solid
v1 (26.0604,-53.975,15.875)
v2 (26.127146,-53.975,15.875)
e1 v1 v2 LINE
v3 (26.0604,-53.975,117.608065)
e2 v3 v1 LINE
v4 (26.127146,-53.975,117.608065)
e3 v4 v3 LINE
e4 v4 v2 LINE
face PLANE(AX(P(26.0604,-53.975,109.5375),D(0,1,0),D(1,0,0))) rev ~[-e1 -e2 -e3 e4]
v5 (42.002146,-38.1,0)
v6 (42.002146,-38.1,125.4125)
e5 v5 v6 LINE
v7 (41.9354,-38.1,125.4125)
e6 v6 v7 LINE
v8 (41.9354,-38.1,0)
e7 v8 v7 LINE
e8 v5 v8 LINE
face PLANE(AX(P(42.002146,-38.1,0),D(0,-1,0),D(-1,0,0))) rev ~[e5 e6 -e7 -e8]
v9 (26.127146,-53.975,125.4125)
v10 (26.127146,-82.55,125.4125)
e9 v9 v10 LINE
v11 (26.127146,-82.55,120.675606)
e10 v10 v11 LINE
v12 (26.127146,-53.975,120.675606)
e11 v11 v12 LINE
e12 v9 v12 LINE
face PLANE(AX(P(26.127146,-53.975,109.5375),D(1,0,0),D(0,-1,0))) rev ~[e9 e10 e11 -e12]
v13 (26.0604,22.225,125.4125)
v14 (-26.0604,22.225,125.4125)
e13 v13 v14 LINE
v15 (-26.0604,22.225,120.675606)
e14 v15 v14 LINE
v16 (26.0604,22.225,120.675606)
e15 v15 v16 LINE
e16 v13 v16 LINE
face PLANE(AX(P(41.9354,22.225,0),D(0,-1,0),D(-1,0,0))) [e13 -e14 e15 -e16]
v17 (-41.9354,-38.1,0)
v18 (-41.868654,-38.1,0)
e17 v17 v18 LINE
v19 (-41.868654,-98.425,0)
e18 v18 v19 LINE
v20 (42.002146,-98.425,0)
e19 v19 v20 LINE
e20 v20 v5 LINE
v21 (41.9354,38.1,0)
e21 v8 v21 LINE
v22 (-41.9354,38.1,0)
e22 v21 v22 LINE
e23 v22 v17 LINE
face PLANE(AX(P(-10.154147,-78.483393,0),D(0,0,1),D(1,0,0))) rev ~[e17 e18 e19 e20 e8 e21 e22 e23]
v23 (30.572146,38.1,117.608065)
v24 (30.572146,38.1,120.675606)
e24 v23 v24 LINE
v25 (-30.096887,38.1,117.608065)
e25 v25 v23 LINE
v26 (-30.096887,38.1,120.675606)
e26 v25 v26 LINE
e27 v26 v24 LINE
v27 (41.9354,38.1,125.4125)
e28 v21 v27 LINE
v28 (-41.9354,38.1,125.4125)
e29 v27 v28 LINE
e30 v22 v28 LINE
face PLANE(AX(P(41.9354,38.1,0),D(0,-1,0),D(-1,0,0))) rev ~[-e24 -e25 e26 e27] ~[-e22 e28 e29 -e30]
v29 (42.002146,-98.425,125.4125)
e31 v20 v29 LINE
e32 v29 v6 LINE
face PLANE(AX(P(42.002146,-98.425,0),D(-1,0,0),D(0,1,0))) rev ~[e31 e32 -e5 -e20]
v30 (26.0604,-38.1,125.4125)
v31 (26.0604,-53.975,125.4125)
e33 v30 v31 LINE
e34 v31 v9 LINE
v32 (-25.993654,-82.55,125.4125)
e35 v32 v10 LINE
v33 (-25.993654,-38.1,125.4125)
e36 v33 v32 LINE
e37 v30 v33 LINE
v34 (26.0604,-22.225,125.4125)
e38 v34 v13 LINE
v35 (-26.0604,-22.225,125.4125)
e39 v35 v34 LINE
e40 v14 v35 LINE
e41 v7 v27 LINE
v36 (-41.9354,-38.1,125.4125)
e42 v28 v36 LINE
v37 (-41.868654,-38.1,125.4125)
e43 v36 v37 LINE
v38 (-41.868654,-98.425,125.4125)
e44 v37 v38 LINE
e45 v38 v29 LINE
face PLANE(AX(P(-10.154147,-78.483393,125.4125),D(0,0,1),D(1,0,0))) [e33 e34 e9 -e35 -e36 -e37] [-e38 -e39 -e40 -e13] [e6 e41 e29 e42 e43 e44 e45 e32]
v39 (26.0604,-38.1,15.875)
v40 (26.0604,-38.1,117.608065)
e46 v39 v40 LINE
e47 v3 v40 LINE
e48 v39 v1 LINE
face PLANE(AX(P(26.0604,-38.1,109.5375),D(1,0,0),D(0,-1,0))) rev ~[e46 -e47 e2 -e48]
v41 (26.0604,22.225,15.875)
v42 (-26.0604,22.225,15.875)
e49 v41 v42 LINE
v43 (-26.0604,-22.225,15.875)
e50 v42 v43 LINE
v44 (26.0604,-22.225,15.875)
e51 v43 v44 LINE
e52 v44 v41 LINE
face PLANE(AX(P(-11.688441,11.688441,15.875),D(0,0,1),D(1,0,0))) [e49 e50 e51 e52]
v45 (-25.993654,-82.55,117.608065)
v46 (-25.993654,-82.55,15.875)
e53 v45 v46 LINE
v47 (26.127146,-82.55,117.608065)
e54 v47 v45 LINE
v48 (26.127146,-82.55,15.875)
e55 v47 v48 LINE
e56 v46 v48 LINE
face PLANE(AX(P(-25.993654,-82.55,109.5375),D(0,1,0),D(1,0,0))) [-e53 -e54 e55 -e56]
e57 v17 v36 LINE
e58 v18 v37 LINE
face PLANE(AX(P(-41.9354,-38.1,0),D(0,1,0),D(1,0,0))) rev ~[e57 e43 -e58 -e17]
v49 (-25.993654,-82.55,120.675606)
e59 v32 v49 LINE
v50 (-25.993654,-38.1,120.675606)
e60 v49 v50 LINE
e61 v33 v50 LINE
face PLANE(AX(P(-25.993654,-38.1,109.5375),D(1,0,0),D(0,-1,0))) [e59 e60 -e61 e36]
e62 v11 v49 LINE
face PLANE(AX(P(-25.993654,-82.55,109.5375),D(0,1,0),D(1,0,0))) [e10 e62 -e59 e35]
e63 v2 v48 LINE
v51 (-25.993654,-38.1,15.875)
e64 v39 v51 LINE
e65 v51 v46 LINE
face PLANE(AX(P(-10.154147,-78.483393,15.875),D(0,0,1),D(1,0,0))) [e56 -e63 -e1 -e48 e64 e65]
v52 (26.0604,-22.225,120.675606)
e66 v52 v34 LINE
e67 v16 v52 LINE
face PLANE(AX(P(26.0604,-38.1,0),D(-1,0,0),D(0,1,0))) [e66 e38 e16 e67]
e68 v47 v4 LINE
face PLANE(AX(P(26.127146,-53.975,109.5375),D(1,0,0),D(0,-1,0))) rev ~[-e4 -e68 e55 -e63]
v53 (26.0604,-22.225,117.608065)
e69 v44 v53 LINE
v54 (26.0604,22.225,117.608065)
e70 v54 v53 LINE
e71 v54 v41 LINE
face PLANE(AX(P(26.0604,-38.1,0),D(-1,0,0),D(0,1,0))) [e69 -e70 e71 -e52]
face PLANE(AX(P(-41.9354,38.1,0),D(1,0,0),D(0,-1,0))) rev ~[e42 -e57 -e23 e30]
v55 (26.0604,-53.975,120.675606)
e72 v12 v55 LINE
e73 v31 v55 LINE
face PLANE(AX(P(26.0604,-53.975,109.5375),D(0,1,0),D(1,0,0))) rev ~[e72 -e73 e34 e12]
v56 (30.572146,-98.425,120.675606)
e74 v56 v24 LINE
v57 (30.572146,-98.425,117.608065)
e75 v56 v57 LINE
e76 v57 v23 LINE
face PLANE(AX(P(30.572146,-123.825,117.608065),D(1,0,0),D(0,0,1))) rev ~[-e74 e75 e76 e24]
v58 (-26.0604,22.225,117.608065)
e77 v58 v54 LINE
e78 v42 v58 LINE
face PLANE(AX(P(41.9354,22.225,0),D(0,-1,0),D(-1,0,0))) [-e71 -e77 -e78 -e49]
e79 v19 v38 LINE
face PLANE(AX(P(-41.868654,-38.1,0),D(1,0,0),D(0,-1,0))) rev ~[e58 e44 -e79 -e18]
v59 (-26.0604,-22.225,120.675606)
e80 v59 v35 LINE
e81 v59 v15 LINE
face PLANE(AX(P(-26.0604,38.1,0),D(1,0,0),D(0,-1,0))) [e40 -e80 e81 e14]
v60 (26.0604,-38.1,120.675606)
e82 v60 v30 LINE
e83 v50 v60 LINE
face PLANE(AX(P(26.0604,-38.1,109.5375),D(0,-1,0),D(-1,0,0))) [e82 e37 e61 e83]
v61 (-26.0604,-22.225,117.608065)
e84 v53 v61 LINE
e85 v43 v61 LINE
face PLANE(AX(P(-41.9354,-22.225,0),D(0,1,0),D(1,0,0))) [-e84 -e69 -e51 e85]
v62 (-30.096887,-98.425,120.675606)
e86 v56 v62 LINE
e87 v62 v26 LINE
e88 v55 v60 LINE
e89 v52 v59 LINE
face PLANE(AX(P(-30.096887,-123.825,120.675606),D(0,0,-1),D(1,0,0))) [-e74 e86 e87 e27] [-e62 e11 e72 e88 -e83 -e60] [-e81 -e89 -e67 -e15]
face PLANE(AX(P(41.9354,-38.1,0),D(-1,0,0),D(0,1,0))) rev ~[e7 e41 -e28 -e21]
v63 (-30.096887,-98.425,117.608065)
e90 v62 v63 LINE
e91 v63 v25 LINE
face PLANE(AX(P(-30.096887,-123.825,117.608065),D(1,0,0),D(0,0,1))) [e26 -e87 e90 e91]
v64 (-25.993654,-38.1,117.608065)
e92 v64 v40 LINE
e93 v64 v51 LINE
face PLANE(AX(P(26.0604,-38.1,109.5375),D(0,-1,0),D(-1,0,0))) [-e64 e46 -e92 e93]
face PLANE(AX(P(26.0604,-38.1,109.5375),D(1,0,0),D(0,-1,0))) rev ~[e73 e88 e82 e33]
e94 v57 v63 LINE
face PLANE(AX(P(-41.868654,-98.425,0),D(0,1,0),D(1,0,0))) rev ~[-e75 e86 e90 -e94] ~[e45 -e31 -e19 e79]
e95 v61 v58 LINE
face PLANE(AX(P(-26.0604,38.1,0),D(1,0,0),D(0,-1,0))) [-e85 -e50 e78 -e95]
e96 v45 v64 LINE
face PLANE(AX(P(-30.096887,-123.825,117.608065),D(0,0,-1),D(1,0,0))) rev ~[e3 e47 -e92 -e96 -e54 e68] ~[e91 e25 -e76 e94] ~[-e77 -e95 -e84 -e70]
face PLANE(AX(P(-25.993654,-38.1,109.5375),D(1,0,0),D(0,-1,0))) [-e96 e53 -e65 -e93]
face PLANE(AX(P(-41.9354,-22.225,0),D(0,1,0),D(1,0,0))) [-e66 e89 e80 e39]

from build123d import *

# Parameters (mm, degrees)
F1_DEPTH      = 125.4125
F2_T          = -15.875
F4_DEPTH      = 125.4125
F5_T          = -15.875
F7_W          = 60.6690326877
F7_H          = 3.0675412395
F8_DEPTH      = 182.626
F8_DEPTH_BACK = 25.4


# Not quite as in the source:
# - a shell that OpenCascade refuses in one call is made with other operations: the cavity is built on its own and cut out


with BuildPart() as f1:
    # F0 (on Top) → F1 (new body)
    with BuildSketch(Plane.XY):
        Polygon((41.9354, 38.1), (-41.9354, 38.1), (-41.9354, -38.1), align=None)
        Polygon((41.9354, -38.1), (41.9354, 38.1), (-41.9354, -38.1), align=None)
    extrude(amount=F1_DEPTH)

    # F2
    f2_openings = [f1.faces().sort_by_distance(p)[0] for p in [
        (0, 0, 125.4125),
    ]]
    offset(amount=F2_T, openings=f2_openings)

    # F3 (on Top) → F4 (join)
    with BuildSketch(Plane.XY):
        Polygon((42.0021460263, -98.425), (-41.8686539737, -38.1), (-41.8686539737, -98.425), align=None)
        Polygon((42.0021460263, -38.1), (-41.8686539737, -38.1), (42.0021460263, -98.425), align=None)
    extrude(amount=F4_DEPTH)

    # F5: a shell. OpenCascade refuses it in one call, so the cavity is built on its own and cut out:
    # the body offset inwards by the wall thickness, plus a prism from it out through each open face.
    f5_core = offset(f1.part, amount=F5_T, kind=Kind.INTERSECTION, mode=Mode.PRIVATE)
    f5_exits = [f5_core.faces().sort_by_distance(p)[0] for p in [
        (0.054837, -60.331537, 109.5375),
    ]]
    add(f5_core, mode=Mode.SUBTRACT)
    extrude(f5_exits, amount=-F5_T, mode=Mode.SUBTRACT)

    # F7 (on offset) → F8 (cut, two sides)
    with BuildSketch(Plane.XZ.offset(123.825)) as f8_sk:
        with Locations((0.2376296824, 119.1418357193)):
            Rectangle(F7_W, F7_H)
    extrude(amount=-F8_DEPTH, mode=Mode.SUBTRACT)
    extrude(f8_sk.sketch, amount=F8_DEPTH_BACK, mode=Mode.SUBTRACT)


solid = f1.part
